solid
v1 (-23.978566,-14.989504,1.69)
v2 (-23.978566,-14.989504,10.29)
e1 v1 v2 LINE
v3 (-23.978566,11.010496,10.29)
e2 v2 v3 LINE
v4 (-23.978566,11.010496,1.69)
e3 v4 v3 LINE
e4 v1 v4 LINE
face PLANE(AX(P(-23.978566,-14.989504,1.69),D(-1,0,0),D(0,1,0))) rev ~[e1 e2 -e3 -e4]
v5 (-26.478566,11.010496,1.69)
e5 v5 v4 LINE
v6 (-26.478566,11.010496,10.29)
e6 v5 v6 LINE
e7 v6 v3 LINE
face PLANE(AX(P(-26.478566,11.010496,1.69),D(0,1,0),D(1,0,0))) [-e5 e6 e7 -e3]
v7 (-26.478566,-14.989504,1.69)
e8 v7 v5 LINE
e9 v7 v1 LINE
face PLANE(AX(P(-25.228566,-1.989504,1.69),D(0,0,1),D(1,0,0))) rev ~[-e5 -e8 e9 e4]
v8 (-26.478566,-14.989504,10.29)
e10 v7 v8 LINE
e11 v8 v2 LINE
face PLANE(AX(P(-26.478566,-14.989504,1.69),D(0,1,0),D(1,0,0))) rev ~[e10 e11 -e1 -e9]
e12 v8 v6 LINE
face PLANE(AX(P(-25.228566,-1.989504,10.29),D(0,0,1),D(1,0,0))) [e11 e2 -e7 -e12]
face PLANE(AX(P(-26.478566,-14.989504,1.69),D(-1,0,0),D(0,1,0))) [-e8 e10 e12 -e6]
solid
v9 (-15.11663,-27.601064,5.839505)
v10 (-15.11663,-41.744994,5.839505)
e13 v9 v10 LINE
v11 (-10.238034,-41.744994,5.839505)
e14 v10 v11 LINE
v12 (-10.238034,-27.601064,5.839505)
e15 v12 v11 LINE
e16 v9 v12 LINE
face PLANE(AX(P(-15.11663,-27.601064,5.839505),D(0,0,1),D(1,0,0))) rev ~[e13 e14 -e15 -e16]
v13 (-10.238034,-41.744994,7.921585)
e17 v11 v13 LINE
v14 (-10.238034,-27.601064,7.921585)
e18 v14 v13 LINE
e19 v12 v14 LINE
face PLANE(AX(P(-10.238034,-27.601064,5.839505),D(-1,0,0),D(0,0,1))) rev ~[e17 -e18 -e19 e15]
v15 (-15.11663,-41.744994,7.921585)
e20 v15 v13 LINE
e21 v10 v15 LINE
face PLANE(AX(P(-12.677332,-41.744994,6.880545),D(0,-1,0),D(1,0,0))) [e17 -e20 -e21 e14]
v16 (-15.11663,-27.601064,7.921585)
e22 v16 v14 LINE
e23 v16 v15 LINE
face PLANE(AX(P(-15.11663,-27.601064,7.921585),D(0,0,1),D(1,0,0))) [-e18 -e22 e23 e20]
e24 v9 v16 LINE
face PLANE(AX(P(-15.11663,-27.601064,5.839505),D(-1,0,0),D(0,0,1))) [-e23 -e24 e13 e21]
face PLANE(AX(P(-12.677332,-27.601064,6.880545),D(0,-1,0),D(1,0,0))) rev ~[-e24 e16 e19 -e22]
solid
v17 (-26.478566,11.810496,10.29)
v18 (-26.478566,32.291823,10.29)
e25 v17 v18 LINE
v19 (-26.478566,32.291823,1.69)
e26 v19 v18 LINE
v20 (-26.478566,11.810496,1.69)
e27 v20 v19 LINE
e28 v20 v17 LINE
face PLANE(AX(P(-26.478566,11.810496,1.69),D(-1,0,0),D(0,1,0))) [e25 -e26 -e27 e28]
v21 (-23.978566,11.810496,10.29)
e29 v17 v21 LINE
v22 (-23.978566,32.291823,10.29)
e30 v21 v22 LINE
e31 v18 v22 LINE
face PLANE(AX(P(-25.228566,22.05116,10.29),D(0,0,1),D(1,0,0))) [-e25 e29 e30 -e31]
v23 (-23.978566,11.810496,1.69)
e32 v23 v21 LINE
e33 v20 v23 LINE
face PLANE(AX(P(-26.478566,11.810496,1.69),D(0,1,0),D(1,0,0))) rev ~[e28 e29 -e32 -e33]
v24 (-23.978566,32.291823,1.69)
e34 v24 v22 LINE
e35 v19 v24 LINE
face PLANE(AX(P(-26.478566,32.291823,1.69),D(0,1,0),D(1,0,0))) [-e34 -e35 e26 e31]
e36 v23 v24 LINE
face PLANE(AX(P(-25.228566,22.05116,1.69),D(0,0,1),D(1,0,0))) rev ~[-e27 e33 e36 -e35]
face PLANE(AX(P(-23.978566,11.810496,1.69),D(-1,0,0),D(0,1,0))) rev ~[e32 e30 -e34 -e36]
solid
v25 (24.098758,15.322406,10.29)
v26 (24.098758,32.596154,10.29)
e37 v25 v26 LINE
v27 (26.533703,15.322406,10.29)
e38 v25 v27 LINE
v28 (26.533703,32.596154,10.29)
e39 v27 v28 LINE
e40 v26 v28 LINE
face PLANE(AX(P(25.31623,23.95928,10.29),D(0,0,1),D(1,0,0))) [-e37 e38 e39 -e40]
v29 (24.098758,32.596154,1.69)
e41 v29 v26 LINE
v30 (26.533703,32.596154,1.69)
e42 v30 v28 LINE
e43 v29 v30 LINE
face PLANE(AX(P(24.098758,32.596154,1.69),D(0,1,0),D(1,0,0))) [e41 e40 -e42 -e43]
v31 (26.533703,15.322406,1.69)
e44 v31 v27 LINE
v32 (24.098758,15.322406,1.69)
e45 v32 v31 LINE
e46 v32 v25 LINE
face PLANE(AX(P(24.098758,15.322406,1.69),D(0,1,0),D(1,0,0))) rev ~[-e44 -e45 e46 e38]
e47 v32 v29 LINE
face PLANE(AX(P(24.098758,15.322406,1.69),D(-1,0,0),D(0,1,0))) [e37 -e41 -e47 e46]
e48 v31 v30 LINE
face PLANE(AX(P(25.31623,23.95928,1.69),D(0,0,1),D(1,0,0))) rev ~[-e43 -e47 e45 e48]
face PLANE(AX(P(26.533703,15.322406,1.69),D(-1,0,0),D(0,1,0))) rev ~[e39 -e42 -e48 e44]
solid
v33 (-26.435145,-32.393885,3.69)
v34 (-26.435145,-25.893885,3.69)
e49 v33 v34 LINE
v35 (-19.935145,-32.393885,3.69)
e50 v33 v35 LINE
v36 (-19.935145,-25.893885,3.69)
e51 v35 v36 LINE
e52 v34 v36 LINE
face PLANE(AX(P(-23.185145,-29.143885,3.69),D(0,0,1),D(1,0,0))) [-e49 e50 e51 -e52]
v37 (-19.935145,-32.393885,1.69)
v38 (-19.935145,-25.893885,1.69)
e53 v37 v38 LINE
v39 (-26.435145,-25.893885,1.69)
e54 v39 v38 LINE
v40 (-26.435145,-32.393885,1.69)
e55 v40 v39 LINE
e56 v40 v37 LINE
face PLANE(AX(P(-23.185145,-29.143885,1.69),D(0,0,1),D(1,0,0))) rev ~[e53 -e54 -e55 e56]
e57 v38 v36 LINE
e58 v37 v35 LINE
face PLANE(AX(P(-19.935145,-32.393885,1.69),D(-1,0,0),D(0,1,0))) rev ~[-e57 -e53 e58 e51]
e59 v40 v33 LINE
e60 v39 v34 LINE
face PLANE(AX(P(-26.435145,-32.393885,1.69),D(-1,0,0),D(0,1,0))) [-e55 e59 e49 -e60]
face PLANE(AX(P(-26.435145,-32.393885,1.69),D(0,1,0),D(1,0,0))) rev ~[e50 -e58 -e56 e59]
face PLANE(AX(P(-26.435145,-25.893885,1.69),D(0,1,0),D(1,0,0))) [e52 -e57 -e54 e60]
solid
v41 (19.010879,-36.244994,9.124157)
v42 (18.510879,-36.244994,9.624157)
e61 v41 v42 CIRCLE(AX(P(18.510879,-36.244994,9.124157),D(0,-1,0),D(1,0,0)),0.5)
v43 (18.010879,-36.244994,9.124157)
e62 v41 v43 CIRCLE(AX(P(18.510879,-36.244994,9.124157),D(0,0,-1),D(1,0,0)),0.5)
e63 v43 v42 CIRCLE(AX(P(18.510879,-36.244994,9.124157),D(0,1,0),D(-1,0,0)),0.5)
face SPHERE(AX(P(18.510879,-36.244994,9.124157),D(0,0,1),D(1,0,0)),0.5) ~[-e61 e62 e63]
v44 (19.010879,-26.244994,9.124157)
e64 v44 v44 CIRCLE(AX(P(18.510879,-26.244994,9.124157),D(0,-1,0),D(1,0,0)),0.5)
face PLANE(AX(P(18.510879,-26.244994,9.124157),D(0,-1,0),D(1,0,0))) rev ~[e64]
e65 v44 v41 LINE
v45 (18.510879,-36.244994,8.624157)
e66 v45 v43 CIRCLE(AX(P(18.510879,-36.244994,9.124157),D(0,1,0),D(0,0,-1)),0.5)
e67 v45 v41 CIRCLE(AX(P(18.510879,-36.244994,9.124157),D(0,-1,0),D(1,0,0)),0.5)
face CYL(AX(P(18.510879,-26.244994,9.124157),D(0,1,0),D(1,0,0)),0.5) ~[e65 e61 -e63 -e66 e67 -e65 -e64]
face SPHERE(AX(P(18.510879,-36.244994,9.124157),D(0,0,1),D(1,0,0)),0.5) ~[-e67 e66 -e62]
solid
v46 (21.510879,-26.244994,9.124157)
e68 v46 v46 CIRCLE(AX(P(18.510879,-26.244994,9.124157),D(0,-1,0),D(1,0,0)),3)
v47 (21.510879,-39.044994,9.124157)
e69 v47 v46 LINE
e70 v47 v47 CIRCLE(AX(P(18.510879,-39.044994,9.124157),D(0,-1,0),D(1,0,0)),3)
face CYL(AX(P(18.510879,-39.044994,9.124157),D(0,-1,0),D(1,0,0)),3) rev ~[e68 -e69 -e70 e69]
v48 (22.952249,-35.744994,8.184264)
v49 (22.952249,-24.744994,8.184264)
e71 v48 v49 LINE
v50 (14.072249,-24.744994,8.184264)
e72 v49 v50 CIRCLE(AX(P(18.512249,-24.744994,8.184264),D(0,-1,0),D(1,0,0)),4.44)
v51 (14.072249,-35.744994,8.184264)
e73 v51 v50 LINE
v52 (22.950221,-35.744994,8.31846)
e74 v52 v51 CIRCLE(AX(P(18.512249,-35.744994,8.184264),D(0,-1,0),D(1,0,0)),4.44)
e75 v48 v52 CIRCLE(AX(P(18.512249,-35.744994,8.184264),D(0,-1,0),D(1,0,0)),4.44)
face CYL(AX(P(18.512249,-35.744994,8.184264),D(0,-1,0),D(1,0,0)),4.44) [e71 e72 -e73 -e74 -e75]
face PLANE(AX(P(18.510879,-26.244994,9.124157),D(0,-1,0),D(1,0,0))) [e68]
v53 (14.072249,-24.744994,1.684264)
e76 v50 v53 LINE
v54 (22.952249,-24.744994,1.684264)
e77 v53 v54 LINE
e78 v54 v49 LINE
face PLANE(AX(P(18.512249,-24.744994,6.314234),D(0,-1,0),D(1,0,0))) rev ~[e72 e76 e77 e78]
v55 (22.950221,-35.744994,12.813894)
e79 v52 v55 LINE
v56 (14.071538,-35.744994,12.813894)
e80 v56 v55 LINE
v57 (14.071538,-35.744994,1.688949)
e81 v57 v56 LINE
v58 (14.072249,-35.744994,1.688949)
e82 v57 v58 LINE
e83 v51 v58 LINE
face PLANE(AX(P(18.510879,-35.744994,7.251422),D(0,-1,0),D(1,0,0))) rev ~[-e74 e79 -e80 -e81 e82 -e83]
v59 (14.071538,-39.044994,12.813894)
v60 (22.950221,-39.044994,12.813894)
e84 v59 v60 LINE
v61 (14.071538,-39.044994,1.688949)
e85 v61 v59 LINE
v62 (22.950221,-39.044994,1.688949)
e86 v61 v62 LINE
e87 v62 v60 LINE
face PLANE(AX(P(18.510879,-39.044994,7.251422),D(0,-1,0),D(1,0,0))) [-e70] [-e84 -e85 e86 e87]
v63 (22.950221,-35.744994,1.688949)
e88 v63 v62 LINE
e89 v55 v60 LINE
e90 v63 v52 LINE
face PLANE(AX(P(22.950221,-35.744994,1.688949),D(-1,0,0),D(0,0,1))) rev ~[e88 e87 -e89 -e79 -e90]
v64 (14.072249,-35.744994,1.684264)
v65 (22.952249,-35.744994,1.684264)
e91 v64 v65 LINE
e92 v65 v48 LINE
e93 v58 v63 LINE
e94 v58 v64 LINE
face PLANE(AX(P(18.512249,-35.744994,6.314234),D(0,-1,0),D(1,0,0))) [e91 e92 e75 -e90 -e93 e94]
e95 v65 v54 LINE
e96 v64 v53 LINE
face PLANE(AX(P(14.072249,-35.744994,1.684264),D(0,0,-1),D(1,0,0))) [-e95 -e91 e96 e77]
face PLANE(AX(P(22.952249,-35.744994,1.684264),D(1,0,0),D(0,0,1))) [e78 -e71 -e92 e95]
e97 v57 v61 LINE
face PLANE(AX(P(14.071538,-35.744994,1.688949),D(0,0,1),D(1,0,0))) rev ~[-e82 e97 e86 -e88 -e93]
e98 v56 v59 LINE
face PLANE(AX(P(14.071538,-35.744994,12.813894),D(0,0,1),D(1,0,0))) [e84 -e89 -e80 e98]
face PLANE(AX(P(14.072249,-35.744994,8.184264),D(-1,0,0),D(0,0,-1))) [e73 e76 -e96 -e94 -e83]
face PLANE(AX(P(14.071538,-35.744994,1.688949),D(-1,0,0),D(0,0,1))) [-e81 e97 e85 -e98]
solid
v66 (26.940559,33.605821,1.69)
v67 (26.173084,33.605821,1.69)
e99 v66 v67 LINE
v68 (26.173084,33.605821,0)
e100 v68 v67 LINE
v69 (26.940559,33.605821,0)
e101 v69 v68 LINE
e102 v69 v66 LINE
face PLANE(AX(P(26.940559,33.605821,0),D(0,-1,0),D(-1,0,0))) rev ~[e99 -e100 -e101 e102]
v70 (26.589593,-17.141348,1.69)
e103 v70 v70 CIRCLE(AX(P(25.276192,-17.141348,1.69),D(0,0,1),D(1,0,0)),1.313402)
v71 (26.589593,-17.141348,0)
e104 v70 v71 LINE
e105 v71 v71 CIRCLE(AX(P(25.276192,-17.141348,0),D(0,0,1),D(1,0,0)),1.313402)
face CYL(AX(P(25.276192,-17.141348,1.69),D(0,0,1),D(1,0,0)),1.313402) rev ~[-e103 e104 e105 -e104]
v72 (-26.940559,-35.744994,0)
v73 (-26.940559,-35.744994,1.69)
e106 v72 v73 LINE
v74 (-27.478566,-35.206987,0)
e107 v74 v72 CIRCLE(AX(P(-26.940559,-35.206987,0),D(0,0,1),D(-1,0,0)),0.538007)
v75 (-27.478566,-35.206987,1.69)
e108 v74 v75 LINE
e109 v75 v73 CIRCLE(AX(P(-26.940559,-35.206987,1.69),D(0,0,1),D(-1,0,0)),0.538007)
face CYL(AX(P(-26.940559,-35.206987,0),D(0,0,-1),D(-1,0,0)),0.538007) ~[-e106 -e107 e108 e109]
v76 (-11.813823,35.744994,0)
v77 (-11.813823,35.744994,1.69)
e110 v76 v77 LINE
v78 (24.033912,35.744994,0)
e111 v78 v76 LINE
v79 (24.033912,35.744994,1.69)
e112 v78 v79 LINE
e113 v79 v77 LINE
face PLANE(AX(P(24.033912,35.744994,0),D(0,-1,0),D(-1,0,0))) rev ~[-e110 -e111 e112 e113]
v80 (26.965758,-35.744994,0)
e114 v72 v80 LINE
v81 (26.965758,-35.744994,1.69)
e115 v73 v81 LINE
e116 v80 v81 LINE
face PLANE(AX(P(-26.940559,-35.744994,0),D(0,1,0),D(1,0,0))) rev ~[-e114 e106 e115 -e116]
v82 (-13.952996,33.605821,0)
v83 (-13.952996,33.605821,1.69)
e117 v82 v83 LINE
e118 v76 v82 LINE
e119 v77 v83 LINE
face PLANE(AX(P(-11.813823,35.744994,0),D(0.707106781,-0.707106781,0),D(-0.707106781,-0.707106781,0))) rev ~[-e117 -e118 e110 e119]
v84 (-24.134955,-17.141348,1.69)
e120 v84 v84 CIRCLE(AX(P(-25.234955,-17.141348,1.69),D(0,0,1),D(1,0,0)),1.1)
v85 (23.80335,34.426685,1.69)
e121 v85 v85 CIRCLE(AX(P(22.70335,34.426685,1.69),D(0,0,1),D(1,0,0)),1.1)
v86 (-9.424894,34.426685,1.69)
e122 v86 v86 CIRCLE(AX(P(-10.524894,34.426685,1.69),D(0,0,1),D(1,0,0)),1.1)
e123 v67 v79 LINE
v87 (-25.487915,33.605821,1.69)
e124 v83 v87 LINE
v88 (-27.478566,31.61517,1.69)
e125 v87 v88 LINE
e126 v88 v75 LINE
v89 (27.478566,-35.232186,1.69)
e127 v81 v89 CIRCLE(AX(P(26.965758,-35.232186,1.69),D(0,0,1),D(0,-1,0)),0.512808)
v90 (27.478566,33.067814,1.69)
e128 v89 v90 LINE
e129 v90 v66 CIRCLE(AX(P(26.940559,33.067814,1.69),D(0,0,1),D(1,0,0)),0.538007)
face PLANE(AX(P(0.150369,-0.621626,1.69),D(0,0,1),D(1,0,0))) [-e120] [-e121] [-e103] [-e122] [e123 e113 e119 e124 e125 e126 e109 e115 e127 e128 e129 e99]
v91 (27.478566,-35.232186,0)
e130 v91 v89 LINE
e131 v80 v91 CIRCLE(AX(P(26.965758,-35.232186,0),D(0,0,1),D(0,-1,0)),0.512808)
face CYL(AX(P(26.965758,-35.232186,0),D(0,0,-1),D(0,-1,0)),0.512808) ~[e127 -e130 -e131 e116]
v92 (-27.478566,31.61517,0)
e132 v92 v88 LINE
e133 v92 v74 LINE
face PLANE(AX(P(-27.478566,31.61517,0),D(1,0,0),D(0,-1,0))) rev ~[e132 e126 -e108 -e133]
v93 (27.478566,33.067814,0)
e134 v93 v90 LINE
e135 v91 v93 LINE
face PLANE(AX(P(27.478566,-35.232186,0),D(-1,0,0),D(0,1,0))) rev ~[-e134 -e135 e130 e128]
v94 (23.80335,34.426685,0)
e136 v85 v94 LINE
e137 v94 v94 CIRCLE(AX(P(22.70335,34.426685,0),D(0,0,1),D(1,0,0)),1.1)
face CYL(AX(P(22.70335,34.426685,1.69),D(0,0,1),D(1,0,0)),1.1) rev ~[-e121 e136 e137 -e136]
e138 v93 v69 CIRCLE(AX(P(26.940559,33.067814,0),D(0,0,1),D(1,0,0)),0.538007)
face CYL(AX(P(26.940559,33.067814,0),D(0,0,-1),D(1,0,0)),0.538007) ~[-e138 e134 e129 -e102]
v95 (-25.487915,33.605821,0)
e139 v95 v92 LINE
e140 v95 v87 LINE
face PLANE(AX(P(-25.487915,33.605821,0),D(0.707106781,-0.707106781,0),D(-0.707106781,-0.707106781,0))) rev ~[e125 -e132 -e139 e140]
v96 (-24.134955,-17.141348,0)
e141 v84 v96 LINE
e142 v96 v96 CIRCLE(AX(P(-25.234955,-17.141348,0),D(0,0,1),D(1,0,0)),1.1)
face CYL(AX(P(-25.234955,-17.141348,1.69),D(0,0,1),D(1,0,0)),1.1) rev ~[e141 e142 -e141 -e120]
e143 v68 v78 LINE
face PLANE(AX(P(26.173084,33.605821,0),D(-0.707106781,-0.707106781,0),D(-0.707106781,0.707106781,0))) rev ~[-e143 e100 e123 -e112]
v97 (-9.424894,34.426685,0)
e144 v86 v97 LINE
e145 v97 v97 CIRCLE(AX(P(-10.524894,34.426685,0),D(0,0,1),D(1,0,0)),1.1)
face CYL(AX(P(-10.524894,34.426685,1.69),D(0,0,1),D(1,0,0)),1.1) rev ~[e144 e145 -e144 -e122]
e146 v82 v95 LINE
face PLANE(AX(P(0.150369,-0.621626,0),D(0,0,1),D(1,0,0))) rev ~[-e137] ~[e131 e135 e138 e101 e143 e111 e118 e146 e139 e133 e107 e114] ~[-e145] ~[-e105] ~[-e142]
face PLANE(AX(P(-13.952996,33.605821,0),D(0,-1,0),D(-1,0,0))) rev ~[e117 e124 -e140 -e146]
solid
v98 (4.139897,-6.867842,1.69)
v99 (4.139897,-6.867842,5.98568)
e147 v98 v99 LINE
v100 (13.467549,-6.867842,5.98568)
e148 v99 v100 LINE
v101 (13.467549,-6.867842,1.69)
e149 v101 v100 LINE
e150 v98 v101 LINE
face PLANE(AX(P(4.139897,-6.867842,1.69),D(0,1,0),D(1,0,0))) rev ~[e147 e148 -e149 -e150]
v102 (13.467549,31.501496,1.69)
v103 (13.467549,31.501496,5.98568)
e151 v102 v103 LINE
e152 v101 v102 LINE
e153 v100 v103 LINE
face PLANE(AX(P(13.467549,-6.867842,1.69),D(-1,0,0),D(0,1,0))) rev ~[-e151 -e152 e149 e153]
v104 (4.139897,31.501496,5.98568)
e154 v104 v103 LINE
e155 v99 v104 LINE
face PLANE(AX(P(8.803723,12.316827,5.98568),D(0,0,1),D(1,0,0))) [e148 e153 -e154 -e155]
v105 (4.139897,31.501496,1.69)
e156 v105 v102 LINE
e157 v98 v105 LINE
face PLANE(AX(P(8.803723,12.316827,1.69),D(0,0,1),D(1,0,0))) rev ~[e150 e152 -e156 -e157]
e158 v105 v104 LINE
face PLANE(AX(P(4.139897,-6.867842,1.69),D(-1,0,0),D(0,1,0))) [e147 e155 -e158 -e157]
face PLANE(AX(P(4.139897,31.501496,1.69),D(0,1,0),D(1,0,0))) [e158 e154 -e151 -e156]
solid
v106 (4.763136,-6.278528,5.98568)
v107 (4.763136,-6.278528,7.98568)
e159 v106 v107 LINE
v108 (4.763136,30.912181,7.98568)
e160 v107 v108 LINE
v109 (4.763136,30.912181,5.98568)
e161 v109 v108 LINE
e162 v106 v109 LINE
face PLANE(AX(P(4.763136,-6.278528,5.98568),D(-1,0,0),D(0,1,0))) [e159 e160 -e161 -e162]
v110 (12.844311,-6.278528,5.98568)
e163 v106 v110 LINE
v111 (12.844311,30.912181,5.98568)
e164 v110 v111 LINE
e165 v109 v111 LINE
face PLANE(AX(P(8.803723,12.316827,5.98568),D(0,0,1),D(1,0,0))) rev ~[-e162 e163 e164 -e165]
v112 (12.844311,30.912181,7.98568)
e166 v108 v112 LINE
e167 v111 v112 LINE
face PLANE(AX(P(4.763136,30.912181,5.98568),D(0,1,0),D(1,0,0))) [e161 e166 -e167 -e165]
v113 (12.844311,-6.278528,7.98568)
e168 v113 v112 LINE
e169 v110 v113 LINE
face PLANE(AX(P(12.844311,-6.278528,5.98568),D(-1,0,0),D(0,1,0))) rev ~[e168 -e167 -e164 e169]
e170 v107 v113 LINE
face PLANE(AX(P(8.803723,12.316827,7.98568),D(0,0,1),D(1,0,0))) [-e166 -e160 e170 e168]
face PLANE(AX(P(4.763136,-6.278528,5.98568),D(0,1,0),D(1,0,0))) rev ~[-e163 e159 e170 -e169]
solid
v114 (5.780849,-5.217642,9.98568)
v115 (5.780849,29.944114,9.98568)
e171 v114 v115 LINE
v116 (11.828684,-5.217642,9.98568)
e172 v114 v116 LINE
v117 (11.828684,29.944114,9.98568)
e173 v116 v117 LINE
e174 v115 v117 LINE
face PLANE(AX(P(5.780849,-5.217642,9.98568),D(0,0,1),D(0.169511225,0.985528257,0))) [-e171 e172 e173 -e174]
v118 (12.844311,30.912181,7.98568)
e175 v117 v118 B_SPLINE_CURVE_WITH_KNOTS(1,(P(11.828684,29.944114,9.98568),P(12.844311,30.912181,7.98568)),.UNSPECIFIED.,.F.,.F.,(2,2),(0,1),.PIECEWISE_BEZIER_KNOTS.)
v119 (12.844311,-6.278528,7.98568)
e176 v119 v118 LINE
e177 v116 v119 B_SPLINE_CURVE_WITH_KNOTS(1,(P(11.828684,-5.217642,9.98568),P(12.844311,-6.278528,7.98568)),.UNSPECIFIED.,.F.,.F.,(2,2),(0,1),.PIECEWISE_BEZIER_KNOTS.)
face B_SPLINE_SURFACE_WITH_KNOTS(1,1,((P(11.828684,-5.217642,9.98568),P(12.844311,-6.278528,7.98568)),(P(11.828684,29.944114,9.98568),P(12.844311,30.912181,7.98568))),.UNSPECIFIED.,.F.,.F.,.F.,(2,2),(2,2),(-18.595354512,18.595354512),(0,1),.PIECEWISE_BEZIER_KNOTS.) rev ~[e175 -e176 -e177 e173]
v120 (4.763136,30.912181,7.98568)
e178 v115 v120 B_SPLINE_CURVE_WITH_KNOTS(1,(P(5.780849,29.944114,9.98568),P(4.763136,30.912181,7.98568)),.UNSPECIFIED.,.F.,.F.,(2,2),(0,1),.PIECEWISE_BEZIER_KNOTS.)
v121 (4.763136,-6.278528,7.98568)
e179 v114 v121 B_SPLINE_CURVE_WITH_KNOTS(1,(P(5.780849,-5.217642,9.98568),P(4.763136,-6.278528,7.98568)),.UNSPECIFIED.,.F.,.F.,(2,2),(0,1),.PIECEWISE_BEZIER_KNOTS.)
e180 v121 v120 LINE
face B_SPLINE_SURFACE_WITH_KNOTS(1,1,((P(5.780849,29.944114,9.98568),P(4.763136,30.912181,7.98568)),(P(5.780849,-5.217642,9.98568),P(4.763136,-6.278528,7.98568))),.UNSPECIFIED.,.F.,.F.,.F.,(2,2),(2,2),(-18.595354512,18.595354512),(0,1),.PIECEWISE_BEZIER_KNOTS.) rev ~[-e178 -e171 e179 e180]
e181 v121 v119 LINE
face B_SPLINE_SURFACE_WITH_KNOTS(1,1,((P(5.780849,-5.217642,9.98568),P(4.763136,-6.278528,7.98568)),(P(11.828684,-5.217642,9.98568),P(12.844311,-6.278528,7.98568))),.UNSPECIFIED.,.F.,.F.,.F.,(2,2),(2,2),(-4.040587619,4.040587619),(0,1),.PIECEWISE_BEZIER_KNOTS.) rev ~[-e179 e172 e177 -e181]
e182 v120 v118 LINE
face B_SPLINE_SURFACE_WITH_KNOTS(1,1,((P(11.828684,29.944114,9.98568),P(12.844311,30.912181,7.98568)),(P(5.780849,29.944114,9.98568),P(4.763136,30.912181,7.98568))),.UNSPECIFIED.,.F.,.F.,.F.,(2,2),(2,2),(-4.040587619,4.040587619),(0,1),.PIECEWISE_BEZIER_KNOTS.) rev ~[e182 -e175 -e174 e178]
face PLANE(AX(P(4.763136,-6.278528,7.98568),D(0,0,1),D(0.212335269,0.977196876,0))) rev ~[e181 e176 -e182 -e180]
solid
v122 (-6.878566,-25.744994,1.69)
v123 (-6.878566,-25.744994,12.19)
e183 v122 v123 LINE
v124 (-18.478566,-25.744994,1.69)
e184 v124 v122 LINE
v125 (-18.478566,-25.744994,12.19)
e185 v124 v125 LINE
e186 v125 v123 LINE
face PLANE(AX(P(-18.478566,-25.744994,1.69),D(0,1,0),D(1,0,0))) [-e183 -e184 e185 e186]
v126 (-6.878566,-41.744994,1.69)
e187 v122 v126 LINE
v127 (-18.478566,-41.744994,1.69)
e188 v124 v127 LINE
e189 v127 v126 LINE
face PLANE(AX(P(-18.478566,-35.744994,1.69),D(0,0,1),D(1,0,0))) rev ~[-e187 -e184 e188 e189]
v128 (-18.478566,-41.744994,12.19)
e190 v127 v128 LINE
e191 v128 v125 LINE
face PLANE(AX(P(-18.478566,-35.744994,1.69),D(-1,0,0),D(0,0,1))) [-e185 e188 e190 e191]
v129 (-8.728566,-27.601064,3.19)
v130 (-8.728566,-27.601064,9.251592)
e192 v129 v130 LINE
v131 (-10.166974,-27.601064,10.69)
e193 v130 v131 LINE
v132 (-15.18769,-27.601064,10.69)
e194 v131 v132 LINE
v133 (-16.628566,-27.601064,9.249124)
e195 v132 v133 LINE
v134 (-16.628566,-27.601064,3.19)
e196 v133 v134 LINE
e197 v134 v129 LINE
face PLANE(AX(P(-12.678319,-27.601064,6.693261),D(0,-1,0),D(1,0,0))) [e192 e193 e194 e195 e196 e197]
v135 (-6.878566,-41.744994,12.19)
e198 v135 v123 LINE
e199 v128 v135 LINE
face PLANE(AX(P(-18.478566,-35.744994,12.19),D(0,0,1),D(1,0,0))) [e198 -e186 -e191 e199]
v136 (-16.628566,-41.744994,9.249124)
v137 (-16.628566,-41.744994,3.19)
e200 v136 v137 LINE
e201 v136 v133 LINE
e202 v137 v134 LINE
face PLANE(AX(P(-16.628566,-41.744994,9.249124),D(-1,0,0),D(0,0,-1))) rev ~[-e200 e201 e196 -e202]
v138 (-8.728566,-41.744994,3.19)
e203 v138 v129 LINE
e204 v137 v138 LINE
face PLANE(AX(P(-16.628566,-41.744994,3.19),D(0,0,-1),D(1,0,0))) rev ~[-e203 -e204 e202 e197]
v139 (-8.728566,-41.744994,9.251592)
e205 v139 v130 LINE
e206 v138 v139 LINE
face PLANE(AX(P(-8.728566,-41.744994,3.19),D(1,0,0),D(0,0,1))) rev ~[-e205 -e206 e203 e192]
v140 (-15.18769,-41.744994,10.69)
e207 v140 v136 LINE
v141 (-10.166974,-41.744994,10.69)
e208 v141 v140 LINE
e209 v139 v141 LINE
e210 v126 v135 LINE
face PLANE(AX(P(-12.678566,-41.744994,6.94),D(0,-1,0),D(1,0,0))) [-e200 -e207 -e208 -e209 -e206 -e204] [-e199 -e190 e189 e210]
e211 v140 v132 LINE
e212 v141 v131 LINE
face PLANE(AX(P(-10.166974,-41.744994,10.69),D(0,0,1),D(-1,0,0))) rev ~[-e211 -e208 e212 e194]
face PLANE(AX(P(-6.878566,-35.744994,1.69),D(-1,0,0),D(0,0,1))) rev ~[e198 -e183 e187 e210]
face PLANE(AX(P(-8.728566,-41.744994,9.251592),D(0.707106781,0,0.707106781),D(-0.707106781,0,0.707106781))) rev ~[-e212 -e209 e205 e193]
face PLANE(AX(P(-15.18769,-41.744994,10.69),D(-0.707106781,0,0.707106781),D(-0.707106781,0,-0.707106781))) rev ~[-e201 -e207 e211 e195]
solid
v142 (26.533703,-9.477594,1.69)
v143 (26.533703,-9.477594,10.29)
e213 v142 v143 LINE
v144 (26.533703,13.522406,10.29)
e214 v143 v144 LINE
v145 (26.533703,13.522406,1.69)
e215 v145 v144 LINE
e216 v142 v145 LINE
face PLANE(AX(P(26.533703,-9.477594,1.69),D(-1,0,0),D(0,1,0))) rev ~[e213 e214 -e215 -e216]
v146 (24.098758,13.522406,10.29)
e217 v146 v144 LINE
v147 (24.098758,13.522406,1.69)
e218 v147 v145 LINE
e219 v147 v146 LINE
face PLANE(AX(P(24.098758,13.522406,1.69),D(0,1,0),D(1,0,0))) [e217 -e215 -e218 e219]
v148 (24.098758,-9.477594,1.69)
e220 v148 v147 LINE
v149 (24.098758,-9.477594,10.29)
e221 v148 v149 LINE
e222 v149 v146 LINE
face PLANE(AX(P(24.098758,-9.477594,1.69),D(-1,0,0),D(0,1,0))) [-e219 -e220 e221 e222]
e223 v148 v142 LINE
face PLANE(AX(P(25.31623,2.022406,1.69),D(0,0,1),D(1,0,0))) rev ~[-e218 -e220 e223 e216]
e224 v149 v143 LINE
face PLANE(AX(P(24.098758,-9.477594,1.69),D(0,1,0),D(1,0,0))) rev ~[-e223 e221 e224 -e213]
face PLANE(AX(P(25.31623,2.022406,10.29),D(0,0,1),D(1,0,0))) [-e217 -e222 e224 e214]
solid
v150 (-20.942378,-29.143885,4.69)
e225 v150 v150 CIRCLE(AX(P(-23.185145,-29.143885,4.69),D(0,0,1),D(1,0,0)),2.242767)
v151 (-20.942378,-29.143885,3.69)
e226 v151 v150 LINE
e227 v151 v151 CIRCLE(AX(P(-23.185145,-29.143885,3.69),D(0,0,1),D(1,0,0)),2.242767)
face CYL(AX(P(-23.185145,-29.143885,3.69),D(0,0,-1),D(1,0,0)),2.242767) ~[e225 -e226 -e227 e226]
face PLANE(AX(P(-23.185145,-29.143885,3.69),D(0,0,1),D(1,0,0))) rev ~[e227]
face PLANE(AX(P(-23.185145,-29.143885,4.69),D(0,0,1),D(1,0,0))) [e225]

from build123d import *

# Parameters (mm, degrees)
F1_DEPTH   = 1.69
F2_W       = 2.434945175
F2_H       = 23
F3_DEPTH   = 8.6
F2_H_2     = 17.2737486292
F2_W_2     = 2.5
F2_H_3     = 20.481327492
F2_H_4     = 26
F6_DEPTH   = 11
F7_W       = 8.87868274
F7_H       = 11.1249446636
F8_DEPTH   = 3.3
F9_R       = 3
F10_DEPTH  = 12.8
F11_R      = 0.5
F12_DEPTH  = 10
F13_W      = 11.6
F13_H      = 10
F14_DEPTH  = 10.5
F15_W      = 11.6
F15_H      = 10.5
F16_DEPTH  = 6
F18_DEPTH  = 14.14393
F19_W      = 4.8785965383
F19_H      = 2.0820805803
F20_DEPTH  = 14.14393
F21_W      = 6.5
F21_H      = 6.5
F22_DEPTH  = 2
F23_R      = 2.2427667378
F24_DEPTH  = 1
F25_W      = 9.3276520822
F25_H      = 38.3693373368
F26_DEPTH  = 4.29568
F27_W      = 8.0811752376
F27_H      = 37.1907090231
F28_DEPTH  = 2
F30_W      = 6.0478351079
F30_H      = 35.1617564447
F28_FACE_W = 8.0811752376
F28_FACE_H = 37.1907090231
F32_R      = 1.1
F33_DEPTH  = 1.691
F34_R      = 1.1
F34_R_2    = 1.3134018391
F35_DEPTH  = 1.691
F37_ANGLE  = 180


with BuildPart() as f1:
    # F0 (on Top) → F1 (new body)
    with BuildSketch(Plane.XY):
        with BuildLine():
            Line((24.0339115262, 35.744994029), (-11.8138234477, 35.744994029))
            Line((-11.8138234477, 35.744994029), (-13.952996046, 33.6058214307))
            Line((-13.952996046, 33.6058214307), (-25.4879149359, 33.6058214307))
            Line((-25.4879149359, 33.6058214307), (-27.4785661542, 31.6151702124))
            Line((-27.4785661542, 31.6151702124), (-27.4785661542, -35.2069868512))
            ThreePointArc((-27.4785661542, -35.2069868512), (-27.3209875002, -35.5874153749), (-26.9405589764, -35.744994029))
            Line((-26.9405589764, -35.744994029), (26.9657578724, -35.744994029))
            ThreePointArc((26.9657578724, -35.744994029), (27.3283680859, -35.5947959607), (27.4785661542, -35.2321857471))
            Line((27.4785661542, -35.2321857471), (27.4785661542, 33.0678142529))
            ThreePointArc((27.4785661542, 33.0678142529), (27.3209875002, 33.4482427766), (26.9405589764, 33.6058214307))
            Line((26.9405589764, 33.6058214307), (26.1730841245, 33.6058214307))
            Line((26.1730841245, 33.6058214307), (24.0339115262, 35.744994029))
        make_face()
    extrude(amount=F1_DEPTH)

    # F32 (on face) → F33 (cut, through all)
    with BuildSketch(Plane.XY.offset(1.69)):
        with Locations((-10.5248941109, 34.4266854227)):
            Circle(F32_R)
        with Locations((22.7033495903, 34.4266854227)):
            Circle(F32_R)
    extrude(amount=-F33_DEPTH, mode=Mode.SUBTRACT)

    # F34 (on face) → F35 (cut, through all)
    with BuildSketch(Plane.XY.offset(1.69)):
        with Locations((-25.2349545183, -17.141347751)):
            Circle(F34_R)
        with Locations((25.2761915326, -17.141347751)):
            Circle(F34_R_2)
    extrude(amount=-F35_DEPTH, mode=Mode.SUBTRACT)


with BuildPart() as f3:
    # F2 (on face) → F3 (new body)
    with BuildSketch(Plane.XY.offset(1.69)):
        with Locations((25.316230242, 2.0224055983)):
            Rectangle(F2_W, F2_H)
    extrude(amount=F3_DEPTH)


with BuildPart() as f3b:
    # F2 (on face) → F3, piece 2 (new body)
    with BuildSketch(Plane.XY.offset(1.69)):
        with Locations((25.316230242, 23.9592799129)):
            Rectangle(F2_W, F2_H_2)
    extrude(amount=F3_DEPTH)


with BuildPart() as f3c:
    # F2 (on face) → F3, piece 3 (new body)
    with BuildSketch(Plane.XY.offset(1.69)):
        with Locations((-25.2285661542, 22.0511595675)):
            Rectangle(F2_W_2, F2_H_3)
    extrude(amount=F3_DEPTH)


with BuildPart() as f3d:
    # F2 (on face) → F3, piece 4 (new body)
    with BuildSketch(Plane.XY.offset(1.69)):
        with Locations((-25.2285661542, -1.9895041785)):
            Rectangle(F2_W_2, F2_H_4)
    extrude(amount=F3_DEPTH)


with BuildPart() as f6:
    # F5 (on offset) → F6 (new body)
    with BuildSketch(Plane.XZ.offset(35.744994029)):
        with BuildLine():
            Line((14.0722493033, 1.6842637178), (22.9522493033, 1.6842637178))
            Line((22.9522493033, 1.6842637178), (22.9522493033, 8.1842637178))
            ThreePointArc((22.9522493033, 8.1842637178), (18.5122493033, 12.6242637178), (14.0722493033, 8.1842637178))
            Line((14.0722493033, 8.1842637178), (14.0722493033, 1.6842637178))
        make_face()
    extrude(amount=-F6_DEPTH)

    # F7 (on offset) → F8 (join)
    with BuildSketch(Plane.XZ.offset(35.744994029)):
        with Locations((18.5108794831, 7.2514217463)):
            Rectangle(F7_W, F7_H)
    extrude(amount=F8_DEPTH)

    # F9 (on face) → F10 (cut)
    with BuildSketch(Plane.XZ.offset(39.044994029)):
        with Locations((18.5108794831, 9.124157019)):
            Circle(F9_R)
    extrude(amount=-F10_DEPTH, mode=Mode.SUBTRACT)


with BuildPart() as f12:
    # F11 (on face) → F12 (new body)
    with BuildSketch(Plane.XZ.offset(26.244994029)):
        with Locations((18.5108794831, 9.124157019)):
            Circle(F11_R)
    extrude(amount=F12_DEPTH)

    # F36 (on face) → F37 (revolve)
    with BuildSketch(Plane.XZ.offset(36.244994029)):
        with BuildLine():
            ThreePointArc((19.0108794831, 9.124157019), (18.8644328737, 9.4777104096), (18.5108794831, 9.624157019))
            Line((18.5108794831, 9.624157019), (18.5108794831, 8.624157019))
            ThreePointArc((18.5108794831, 8.624157019), (18.8644328737, 8.7706036284), (19.0108794831, 9.124157019))
        make_face()
    revolve(axis=Axis((18.5108794831, -36.244994029, 9.124157019), (0, 0, -1)), revolution_arc=F37_ANGLE)


with BuildPart() as f14:
    # F13 (on face) → F14 (new body)
    with BuildSketch(Plane.XY.offset(1.69)):
        with Locations((-12.6785661542, -30.744994029)):
            Rectangle(F13_W, F13_H)
    extrude(amount=F14_DEPTH)

    # F15 (on face) → F16 (join)
    with BuildSketch(Plane.XZ.offset(35.744994029)):
        with Locations((-12.6785661542, 6.94)):
            Rectangle(F15_W, F15_H)
    extrude(amount=F16_DEPTH)

    # F17 (on face) → F18 (cut)
    with BuildSketch(Plane.XZ.offset(41.744994029)):
        Polygon((-16.6285661542, 9.2491237447), (-16.6285661542, 3.19), (-8.7285661542, 3.19), (-8.7285661542, 9.2515923473), (-10.1669738069, 10.69), (-15.1876898989, 10.69), align=None)
    extrude(amount=-F18_DEPTH, mode=Mode.SUBTRACT)


with BuildPart() as f20:
    # F19 (on face) → F20 (new body, through all)
    with BuildSketch(Plane.XZ.offset(27.601064029)):
        with Locations((-12.6773318529, 6.8805450574)):
            Rectangle(F19_W, F19_H)
    extrude(amount=F20_DEPTH)


with BuildPart() as f22:
    # F21 (on face) → F22 (new body)
    with BuildSketch(Plane.XY.offset(1.69)):
        with Locations((-23.1851451099, -29.143884778)):
            Rectangle(F21_W, F21_H)
    extrude(amount=F22_DEPTH)


with BuildPart() as f24:
    # F23 (on face) → F24 (new body)
    with BuildSketch(Plane.XY.offset(3.69)):
        with Locations((-23.1851451099, -29.143884778)):
            Circle(F23_R)
    extrude(amount=F24_DEPTH)


with BuildPart() as f26:
    # F25 (on face) → F26 (new body)
    with BuildSketch(Plane.XY.offset(1.69)):
        with Locations((8.8037233053, 12.316826851)):
            Rectangle(F25_W, F25_H)
    extrude(amount=F26_DEPTH)


with BuildPart() as f28:
    # F27 (on face) → F28 (new body)
    with BuildSketch(Plane.XY.offset(5.98568)):
        with Locations((8.8037233053, 12.316826851)):
            Rectangle(F27_W, F27_H)
    extrude(amount=F28_DEPTH)


with BuildPart() as f31:
    # F30 (on offset) → F31 section 0
    with BuildSketch(Plane.XY.offset(9.98568)):
        with Locations((8.8047666941, 12.3632361647)):
            Rectangle(F30_W, F30_H)
    # F28_face (on face) → F31 section 1
    with BuildSketch(Plane(origin=(8.8037233053, 12.316826851, 7.98568), x_dir=(1, 0, 0), z_dir=(0, 0, 1))):
        Rectangle(F28_FACE_W, F28_FACE_H)
    loft()


solid = Compound([f1.part, f3.part, f3b.part, f3c.part, f3d.part, f6.part, f12.part, f14.part, f20.part, f22.part, f24.part, f26.part, f28.part, f31.part])
